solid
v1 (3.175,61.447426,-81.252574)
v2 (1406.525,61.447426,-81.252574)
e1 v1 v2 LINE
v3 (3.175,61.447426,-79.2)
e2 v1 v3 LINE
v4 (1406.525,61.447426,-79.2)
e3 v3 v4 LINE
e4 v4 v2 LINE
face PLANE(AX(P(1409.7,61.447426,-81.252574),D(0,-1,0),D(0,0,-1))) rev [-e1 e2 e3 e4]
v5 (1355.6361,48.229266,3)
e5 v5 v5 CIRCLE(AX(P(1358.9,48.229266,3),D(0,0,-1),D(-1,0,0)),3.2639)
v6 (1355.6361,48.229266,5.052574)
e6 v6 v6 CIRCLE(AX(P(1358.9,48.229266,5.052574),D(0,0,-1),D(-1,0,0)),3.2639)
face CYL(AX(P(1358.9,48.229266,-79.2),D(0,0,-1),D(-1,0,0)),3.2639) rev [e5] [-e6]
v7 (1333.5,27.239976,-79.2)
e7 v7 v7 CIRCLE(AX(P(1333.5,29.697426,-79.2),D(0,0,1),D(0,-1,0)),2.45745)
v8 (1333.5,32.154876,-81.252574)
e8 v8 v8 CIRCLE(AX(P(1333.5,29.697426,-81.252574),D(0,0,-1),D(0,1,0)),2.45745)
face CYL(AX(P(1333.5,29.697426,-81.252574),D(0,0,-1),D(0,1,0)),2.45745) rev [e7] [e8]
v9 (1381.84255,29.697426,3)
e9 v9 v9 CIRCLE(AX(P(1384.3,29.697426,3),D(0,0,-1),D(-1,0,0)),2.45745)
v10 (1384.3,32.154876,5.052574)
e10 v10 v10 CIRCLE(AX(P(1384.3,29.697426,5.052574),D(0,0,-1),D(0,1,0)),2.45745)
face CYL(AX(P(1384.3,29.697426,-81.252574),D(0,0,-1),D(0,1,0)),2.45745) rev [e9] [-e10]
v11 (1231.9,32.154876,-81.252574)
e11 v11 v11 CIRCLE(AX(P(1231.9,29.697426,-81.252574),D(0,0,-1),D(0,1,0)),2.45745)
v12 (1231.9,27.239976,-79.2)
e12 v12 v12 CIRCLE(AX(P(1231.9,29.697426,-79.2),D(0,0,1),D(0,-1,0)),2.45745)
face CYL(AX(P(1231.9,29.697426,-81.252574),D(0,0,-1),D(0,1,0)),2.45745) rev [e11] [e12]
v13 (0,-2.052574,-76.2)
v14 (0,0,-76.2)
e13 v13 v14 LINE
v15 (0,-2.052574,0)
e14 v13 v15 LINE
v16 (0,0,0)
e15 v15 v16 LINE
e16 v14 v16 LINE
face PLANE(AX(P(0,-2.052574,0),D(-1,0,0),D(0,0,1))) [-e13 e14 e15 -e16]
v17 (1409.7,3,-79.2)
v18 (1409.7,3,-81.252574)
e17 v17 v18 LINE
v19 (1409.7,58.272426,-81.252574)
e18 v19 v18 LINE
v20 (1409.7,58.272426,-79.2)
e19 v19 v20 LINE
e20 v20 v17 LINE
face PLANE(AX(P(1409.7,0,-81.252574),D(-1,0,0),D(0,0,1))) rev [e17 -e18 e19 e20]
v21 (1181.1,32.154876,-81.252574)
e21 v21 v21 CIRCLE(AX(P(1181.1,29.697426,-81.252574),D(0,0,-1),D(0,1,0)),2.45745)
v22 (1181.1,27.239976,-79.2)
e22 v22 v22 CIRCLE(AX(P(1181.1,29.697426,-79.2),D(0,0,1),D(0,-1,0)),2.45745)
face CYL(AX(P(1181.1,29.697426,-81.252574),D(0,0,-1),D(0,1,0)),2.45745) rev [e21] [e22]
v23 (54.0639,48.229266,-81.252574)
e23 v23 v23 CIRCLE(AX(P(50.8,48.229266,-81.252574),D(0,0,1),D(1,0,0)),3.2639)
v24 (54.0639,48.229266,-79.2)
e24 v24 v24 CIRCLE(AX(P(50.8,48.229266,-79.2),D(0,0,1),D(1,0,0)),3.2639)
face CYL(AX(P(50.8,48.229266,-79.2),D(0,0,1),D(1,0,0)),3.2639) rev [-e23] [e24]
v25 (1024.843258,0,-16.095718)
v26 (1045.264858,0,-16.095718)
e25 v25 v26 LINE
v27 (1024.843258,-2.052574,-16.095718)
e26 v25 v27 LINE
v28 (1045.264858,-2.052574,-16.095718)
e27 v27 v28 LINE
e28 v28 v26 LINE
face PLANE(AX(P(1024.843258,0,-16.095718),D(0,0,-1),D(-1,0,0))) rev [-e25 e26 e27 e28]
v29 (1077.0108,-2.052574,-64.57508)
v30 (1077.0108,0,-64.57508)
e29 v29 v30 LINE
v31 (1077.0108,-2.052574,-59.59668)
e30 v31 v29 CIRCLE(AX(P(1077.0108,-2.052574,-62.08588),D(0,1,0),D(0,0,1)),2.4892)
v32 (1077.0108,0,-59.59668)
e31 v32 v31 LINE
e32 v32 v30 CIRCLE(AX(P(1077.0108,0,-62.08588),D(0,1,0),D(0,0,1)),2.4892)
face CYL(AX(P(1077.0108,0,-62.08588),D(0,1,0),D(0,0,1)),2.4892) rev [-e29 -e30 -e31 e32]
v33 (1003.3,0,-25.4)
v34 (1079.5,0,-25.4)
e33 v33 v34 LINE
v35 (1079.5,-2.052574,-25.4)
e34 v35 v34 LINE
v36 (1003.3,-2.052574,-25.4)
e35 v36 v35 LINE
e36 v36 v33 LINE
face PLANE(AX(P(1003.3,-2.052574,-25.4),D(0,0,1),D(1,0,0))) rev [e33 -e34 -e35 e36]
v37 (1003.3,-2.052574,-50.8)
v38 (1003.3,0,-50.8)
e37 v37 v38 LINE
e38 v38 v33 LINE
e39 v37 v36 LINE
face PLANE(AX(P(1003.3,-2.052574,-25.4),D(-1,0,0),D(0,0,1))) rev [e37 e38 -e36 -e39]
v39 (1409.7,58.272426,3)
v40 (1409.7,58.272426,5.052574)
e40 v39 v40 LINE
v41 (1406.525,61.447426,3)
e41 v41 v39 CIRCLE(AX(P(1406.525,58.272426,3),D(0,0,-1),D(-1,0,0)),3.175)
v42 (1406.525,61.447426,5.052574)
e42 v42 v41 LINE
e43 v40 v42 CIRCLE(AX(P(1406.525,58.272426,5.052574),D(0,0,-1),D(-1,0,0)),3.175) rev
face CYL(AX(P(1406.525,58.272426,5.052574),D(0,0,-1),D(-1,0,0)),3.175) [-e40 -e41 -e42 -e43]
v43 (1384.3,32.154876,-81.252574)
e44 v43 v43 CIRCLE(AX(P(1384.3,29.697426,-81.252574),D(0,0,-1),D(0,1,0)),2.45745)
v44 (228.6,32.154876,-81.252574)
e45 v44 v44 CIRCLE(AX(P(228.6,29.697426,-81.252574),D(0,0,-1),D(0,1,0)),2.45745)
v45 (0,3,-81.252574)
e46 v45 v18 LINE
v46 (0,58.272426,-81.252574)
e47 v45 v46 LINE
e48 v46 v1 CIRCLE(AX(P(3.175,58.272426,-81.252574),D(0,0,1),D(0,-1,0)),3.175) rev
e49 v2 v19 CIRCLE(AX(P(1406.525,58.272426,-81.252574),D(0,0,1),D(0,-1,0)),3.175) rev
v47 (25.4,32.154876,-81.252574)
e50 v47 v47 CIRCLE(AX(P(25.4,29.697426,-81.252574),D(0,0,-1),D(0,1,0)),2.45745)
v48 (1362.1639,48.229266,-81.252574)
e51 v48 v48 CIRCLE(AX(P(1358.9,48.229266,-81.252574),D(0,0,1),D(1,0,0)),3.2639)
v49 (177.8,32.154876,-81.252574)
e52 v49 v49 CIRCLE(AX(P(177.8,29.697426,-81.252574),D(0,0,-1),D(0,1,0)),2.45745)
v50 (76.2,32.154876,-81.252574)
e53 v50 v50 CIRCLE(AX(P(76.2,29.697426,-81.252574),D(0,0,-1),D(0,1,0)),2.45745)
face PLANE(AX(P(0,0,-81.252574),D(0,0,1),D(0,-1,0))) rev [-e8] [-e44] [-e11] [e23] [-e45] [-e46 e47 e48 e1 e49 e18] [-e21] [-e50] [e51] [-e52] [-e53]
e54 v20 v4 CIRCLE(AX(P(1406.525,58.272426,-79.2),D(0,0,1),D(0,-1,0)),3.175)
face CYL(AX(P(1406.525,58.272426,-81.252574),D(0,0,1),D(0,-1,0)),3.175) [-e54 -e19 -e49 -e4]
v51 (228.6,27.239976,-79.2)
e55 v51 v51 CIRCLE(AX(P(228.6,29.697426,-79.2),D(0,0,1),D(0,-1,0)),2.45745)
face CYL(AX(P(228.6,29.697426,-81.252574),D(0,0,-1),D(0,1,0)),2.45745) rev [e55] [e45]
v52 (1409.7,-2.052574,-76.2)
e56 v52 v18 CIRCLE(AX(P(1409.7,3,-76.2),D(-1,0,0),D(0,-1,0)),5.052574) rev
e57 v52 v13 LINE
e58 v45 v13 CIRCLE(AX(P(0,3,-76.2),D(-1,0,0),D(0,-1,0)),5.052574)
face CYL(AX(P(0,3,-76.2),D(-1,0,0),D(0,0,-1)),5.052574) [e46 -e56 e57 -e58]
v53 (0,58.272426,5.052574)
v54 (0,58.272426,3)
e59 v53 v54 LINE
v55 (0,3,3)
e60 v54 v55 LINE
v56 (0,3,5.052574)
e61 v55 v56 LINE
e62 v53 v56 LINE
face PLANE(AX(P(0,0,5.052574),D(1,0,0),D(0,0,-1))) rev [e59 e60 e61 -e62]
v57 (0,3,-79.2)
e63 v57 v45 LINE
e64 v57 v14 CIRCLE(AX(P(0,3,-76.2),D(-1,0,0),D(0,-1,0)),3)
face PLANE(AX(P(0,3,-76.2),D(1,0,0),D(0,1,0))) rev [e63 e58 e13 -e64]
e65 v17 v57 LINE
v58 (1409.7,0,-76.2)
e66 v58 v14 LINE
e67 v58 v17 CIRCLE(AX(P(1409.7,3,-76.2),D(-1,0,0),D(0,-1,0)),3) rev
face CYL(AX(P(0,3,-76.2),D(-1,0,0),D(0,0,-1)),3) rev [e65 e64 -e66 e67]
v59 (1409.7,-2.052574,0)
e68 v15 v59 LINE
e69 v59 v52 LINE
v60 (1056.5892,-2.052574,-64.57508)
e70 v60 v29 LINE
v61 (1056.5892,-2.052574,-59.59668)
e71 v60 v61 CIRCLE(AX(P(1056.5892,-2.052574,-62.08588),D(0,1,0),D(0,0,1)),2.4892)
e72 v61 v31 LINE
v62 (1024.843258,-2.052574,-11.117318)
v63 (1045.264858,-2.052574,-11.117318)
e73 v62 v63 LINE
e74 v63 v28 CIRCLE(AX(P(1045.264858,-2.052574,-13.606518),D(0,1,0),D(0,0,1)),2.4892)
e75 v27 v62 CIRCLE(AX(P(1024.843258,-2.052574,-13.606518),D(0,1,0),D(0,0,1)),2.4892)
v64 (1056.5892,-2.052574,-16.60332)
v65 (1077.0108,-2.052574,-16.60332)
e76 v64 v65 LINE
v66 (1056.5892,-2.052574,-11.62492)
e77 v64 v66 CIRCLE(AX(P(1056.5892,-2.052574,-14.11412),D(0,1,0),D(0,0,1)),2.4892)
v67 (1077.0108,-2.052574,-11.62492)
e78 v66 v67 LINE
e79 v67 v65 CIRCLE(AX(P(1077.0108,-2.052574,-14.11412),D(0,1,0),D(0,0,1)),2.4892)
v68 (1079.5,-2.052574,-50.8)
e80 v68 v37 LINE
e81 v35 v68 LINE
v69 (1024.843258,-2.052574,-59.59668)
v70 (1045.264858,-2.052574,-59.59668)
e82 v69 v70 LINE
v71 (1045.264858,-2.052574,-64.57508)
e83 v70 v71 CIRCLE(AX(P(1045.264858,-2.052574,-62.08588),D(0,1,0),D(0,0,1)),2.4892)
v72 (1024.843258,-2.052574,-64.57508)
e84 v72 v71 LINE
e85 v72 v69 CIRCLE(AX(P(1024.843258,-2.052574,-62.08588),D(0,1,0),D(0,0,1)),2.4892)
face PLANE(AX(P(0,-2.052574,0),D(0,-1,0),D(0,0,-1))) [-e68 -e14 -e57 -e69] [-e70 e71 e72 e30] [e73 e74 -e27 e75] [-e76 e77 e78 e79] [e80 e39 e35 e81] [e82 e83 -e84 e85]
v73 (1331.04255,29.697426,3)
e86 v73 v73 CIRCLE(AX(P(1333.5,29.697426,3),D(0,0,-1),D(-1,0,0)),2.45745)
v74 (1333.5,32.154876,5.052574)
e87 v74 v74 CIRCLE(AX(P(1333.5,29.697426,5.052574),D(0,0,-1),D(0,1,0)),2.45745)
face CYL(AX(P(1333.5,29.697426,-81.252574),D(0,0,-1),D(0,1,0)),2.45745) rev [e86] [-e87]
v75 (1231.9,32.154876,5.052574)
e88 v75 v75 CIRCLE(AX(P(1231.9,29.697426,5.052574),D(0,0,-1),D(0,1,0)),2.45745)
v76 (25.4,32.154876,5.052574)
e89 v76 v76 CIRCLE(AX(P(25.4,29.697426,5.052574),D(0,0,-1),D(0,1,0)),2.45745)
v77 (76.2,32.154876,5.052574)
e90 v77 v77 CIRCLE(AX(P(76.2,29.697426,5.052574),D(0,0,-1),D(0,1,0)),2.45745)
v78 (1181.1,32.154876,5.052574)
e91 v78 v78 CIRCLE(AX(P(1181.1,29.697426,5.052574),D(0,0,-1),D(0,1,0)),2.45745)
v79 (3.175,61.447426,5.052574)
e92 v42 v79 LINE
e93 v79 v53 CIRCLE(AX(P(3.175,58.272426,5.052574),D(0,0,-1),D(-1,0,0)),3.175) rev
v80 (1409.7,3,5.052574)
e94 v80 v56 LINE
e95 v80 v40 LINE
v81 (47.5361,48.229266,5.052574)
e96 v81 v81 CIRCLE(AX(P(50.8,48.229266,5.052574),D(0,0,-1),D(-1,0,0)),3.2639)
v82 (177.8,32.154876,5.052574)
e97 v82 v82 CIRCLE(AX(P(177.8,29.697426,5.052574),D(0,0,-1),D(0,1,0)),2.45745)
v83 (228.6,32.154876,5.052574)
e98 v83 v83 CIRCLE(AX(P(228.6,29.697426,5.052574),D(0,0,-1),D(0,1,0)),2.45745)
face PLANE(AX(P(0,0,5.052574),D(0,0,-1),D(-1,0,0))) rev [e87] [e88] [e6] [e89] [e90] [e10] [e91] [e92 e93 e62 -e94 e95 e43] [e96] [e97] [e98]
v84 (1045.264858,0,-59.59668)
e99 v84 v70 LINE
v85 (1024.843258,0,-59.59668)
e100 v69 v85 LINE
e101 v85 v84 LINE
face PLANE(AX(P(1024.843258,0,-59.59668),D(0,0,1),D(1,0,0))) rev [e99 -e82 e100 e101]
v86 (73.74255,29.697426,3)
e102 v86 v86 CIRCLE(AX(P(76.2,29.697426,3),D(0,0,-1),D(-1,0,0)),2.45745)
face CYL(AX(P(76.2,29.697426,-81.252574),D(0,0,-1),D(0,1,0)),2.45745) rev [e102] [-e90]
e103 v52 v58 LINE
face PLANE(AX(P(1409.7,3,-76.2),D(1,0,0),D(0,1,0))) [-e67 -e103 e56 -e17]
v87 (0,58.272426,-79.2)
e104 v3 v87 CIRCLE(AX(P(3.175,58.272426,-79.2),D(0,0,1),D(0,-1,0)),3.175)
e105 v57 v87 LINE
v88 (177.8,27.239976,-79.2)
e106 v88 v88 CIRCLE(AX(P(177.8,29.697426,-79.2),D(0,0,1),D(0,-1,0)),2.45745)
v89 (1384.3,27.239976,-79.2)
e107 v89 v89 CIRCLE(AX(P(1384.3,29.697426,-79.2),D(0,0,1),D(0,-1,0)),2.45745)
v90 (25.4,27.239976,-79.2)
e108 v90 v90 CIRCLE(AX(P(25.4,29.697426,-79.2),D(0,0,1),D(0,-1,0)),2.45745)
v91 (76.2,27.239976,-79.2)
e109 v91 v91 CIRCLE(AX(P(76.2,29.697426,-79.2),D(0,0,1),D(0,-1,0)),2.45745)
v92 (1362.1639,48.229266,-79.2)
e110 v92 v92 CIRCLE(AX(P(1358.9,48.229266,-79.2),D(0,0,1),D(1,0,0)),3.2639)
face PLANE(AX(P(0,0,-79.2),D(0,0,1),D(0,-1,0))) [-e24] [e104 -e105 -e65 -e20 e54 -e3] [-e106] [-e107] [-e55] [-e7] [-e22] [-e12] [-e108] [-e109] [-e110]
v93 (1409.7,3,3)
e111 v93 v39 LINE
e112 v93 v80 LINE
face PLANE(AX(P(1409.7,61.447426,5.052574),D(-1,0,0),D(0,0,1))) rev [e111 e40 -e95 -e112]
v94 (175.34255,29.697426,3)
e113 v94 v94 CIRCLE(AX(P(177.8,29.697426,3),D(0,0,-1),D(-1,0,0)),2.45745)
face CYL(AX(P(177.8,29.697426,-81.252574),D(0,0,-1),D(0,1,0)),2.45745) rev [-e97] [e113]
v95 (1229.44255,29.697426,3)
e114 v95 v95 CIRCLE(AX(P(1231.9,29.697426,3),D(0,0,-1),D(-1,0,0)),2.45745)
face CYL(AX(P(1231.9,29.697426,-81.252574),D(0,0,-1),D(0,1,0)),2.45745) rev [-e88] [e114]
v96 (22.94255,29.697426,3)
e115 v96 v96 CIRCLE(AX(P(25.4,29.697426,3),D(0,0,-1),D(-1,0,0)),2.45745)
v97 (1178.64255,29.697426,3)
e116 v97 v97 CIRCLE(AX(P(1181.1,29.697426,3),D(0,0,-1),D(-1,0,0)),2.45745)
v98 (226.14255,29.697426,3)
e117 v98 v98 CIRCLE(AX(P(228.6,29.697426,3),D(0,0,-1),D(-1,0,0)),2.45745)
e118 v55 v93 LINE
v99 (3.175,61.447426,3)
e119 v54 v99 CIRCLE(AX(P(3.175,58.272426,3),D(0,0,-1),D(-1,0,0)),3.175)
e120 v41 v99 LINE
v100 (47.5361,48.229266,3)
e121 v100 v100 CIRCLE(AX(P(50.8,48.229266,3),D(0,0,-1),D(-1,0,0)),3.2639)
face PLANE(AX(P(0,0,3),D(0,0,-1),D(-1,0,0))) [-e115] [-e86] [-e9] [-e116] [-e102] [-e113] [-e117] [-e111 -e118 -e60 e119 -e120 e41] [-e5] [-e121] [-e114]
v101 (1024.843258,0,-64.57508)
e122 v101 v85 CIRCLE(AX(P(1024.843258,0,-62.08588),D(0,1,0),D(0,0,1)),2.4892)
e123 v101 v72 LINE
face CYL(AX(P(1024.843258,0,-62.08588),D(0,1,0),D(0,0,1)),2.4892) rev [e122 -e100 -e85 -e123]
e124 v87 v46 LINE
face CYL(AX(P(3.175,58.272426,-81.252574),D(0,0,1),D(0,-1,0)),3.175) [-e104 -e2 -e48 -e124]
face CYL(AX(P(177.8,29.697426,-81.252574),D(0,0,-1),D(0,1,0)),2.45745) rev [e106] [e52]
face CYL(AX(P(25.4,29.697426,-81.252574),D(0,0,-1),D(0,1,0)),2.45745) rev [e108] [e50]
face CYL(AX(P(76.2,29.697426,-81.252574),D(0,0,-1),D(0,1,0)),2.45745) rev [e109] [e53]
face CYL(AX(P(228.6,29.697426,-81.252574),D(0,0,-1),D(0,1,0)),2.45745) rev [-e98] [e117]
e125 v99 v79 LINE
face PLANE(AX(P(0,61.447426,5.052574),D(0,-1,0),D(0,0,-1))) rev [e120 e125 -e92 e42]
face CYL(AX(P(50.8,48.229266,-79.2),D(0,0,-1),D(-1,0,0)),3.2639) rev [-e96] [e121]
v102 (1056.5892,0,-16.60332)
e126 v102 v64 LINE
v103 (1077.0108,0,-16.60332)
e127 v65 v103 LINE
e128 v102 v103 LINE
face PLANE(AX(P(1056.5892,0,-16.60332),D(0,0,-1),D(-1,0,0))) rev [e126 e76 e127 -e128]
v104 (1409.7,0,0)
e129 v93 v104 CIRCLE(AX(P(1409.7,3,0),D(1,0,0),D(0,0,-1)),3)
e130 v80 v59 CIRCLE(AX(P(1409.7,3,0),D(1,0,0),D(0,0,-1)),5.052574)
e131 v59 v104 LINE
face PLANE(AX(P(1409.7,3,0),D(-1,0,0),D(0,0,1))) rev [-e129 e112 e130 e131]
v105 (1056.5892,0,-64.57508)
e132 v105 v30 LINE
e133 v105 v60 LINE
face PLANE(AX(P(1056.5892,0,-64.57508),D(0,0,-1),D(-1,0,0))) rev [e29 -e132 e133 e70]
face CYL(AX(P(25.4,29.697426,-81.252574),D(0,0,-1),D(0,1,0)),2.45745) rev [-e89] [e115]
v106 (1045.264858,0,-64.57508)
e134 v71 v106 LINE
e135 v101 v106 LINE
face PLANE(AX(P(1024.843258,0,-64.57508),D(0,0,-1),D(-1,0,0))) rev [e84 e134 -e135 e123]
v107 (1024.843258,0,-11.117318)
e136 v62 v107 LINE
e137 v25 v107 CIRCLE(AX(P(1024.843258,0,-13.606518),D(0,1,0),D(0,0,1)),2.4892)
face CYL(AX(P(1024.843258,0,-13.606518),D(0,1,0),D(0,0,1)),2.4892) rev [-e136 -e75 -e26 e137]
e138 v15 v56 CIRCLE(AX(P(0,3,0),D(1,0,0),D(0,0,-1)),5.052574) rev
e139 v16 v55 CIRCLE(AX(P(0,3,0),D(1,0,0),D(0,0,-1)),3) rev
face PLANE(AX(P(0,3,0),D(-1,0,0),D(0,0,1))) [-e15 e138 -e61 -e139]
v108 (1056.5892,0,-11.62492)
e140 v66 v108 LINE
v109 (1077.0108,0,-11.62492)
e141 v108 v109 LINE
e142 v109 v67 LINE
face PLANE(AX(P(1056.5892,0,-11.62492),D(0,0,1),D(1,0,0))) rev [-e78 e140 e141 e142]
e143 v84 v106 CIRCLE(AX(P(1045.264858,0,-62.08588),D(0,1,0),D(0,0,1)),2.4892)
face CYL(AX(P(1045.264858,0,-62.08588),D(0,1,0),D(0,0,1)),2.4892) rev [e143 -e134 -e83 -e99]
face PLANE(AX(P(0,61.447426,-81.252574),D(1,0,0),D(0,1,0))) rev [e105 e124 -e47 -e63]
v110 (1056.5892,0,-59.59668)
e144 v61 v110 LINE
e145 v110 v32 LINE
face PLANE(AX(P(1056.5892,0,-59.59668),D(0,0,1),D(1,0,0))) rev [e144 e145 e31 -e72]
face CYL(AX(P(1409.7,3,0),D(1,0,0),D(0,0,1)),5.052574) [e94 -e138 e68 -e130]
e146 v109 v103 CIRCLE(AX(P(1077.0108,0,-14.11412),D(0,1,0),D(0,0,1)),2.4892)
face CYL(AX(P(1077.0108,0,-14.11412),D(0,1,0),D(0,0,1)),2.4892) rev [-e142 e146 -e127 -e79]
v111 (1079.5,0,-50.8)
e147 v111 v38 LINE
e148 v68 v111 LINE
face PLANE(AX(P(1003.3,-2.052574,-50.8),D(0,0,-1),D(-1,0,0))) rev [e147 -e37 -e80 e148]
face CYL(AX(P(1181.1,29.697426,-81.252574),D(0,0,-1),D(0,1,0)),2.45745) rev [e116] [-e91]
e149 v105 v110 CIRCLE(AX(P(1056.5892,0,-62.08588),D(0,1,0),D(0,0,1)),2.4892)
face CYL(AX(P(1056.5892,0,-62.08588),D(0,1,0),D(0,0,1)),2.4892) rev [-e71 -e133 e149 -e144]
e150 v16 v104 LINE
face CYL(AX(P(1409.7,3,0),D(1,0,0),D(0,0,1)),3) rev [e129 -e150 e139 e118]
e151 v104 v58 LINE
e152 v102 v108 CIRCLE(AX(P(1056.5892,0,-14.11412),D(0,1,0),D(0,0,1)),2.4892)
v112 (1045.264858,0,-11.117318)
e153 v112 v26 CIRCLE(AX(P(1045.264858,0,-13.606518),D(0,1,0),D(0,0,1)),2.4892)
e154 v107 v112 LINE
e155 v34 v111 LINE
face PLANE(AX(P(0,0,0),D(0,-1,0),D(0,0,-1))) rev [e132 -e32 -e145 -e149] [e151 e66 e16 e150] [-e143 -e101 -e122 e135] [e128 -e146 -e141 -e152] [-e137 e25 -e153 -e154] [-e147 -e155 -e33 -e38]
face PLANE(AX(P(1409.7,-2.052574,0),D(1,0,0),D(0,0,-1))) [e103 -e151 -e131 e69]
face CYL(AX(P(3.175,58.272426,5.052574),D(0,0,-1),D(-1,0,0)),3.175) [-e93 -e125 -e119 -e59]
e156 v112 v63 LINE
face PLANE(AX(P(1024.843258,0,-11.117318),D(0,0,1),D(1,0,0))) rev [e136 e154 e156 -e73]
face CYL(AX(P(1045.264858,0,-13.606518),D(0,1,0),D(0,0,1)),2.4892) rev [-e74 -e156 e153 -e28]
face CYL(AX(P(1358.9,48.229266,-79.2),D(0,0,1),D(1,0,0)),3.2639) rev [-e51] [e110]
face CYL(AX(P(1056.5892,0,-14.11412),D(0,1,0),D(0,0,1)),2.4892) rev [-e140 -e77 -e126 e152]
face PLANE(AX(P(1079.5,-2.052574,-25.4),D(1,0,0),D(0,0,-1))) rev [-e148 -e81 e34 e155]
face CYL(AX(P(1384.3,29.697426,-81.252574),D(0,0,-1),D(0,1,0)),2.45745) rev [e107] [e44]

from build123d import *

# Parameters (mm, degrees)
SKETCH1_W                         = 1409.7
SKETCH1_H                         = 76.2
BASE_FLANGE1_DEPTH                = 2.052574
EDGE_FLANGE1_DEPTH                = 1409.7
EDGE_FLANGE1_BEND_DEPTH           = 1409.7
SKETCH12_W                        = 76.2
SKETCH12_H                        = 25.4
CUT_EXTRUDE1_DEPTH                = 1414.376049374
F_9_START                         = -2.052574
F_9_0_196_DIAMETER_SLOT1_DEPTH    = 2.052574
F_10_0_1935_DIAMETER_HOLE1_D      = 4.9149
SKETCH18_W                        = 3.2639
SKETCH18_H                        = 84.252574
F_0_257_DIAMETER_HOLE1_AT_2_COUNT = 2
F_0_257_DIAMETER_HOLE1_AT_2_PITCH = 1308.1
F_0_257_DIAMETER_HOLE2_D          = 6.5278
FILLET1_R                         = 3.175


# Read off the part's stored shape, not the designer's step: #9 (0.196) Diameter Slot1
# Sheet-metal steps are written as plain solids
with BuildPart() as part:
    # Sketch1 → Base-Flange1 (new body)
    with BuildSketch(Plane(origin=(0, 0, 0), x_dir=(1, 0, 0), z_dir=(0, 1, 0))):
        with Locations((704.85, 38.1)):
            Rectangle(SKETCH1_W, SKETCH1_H)
    extrude(amount=-BASE_FLANGE1_DEPTH)

    # Edge-Flange1 section (across the edge) → Edge-Flange1 (add)
    with BuildSketch(Plane(origin=(0, 0, 3), x_dir=(0, 0, -1), z_dir=(1, 0, 0))):
        with BuildLine():
            Line((-2.052574, 3), (-2.052574, 61.447426))
            Line((-2.052574, 61.447426), (0, 61.447426))
            Line((0, 61.447426), (0, 3))
            ThreePointArc((0, 3), (0.878679656, 0.878679656), (3, 0))
            Line((3, 0), (3, -2.052574))
            ThreePointArc((3, -2.052574), (-0.572709338, -0.572709338), (-2.052574, 3))
        make_face()
    extrude(amount=EDGE_FLANGE1_DEPTH)

    # Edge-Flange1 section 2 (across the edge) → Edge-Flange1 bend (add)
    with BuildSketch(Plane(origin=(1409.7, 0, -79.2), x_dir=(0, 0, 1), z_dir=(-1, 0, 0))):
        with BuildLine():
            Line((-2.052574, 3), (-2.052574, 61.447426))
            Line((-2.052574, 61.447426), (0, 61.447426))
            Line((0, 61.447426), (0, 3))
            ThreePointArc((0, 3), (0.878679656, 0.878679656), (3, 0))
            Line((3, 0), (3, -2.052574))
            ThreePointArc((3, -2.052574), (-0.572709338, -0.572709338), (-2.052574, 3))
        make_face()
    extrude(amount=EDGE_FLANGE1_BEND_DEPTH)

    # Sketch12 → Cut-Extrude1 (cut, through all)
    with BuildSketch(Plane(origin=(0, 0, 0), x_dir=(1, 0, 0), z_dir=(0, 1, 0))):
        with Locations((1041.4, 38.1)):
            Rectangle(SKETCH12_W, SKETCH12_H)
    extrude(amount=-CUT_EXTRUDE1_DEPTH, mode=Mode.SUBTRACT)

    # #9 (0.196) Diameter Slot1 outline → #9 (0.196) Diameter Slot1 (cut)
    with BuildSketch(Plane(origin=(0, 0, 0), x_dir=(1, 0, 0), z_dir=(0, 1, 0)).offset(F_9_START)):
        with BuildLine():
            Line((1024.843257889, 59.59668), (1045.264857889, 59.59668))
            ThreePointArc((1045.264857889, 59.59668), (1047.754057889, 62.08588), (1045.264857889, 64.57508))
            Line((1045.264857889, 64.57508), (1024.843257889, 64.57508))
            ThreePointArc((1024.843257889, 64.57508), (1022.354057889, 62.08588), (1024.843257889, 59.59668))
        make_face()
        with BuildLine():
            ThreePointArc((1077.0108, 59.59668), (1079.5, 62.08588), (1077.0108, 64.57508))
            Line((1077.0108, 64.57508), (1056.5892, 64.57508))
            ThreePointArc((1056.5892, 64.57508), (1054.1, 62.08588), (1056.5892, 59.59668))
            Line((1056.5892, 59.59668), (1077.0108, 59.59668))
        make_face()
        with BuildLine():
            Line((1024.843257889, 11.117318322), (1045.264857889, 11.117318322))
            ThreePointArc((1045.264857889, 11.117318322), (1047.754057889, 13.606518322), (1045.264857889, 16.095718322))
            Line((1045.264857889, 16.095718322), (1024.843257889, 16.095718322))
            ThreePointArc((1024.843257889, 16.095718322), (1022.354057889, 13.606518322), (1024.843257889, 11.117318322))
        make_face()
        with BuildLine():
            Line((1056.5892, 11.62492), (1077.0108, 11.62492))
            ThreePointArc((1077.0108, 11.62492), (1079.5, 14.11412), (1077.0108, 16.60332))
            Line((1077.0108, 16.60332), (1056.5892, 16.60332))
            ThreePointArc((1056.5892, 16.60332), (1054.1, 14.11412), (1056.5892, 11.62492))
        make_face()
    extrude(amount=F_9_0_196_DIAMETER_SLOT1_DEPTH, mode=Mode.SUBTRACT)

    # #10 (0.1935) Diameter Hole1 (through all)
    with Locations(Plane(origin=(0, 0, -81.252574), x_dir=(-1, 0, 0), z_dir=(0, 0, -1))):
        with Locations((-1384.3, 29.697426), (-1333.5, 29.697426), (-1231.9, 29.697426), (-1181.1, 29.697426), (-228.6, 29.697426), (-177.8, 29.697426), (-76.2, 29.697426), (-25.4, 29.697426)):
            Hole(F_10_0_1935_DIAMETER_HOLE1_D / 2)

    # Sketch18 → F (0.257) Diameter Hole1 (revolve, cut)
    with BuildSketch(Plane(origin=(1358.9, 48.229266, -79.2), x_dir=(0, 1, 0), z_dir=(1, 0, 0))):
        with Locations((1.63195, 42.126287)):
            Rectangle(SKETCH18_W, SKETCH18_H)
    f_0_257_diameter_hole1 = revolve(axis=Axis((1358.9, 48.229266, -85.55), (0, 0, 1)), mode=Mode.SUBTRACT)

    # F (0.257) Diameter Hole1 at 2: F (0.257) Diameter Hole1 ×2
    with Locations(*[(-i * F_0_257_DIAMETER_HOLE1_AT_2_PITCH, 0, 0) for i in range(1, F_0_257_DIAMETER_HOLE1_AT_2_COUNT)]):
        add(f_0_257_diameter_hole1, mode=Mode.SUBTRACT)

    # F (0.257) Diameter Hole2 (through all)
    with Locations(Plane.XY.offset(-79.2)):
        with Locations((50.8, 48.229266), (1358.9, 48.229266)):
            Hole(F_0_257_DIAMETER_HOLE2_D / 2)

    # Fillet1
    fillet1_edges = [part.edges().sort_by_distance(p)[0] for p in [
        (0, 61.447426, 4.026287),
        (1409.7, 61.447426, 4.026287),
        (1409.7, 61.447426, -80.226287),
        (0, 61.447426, -80.226287),
    ]]
    fillet(fillet1_edges, radius=FILLET1_R)


solid = part.part
